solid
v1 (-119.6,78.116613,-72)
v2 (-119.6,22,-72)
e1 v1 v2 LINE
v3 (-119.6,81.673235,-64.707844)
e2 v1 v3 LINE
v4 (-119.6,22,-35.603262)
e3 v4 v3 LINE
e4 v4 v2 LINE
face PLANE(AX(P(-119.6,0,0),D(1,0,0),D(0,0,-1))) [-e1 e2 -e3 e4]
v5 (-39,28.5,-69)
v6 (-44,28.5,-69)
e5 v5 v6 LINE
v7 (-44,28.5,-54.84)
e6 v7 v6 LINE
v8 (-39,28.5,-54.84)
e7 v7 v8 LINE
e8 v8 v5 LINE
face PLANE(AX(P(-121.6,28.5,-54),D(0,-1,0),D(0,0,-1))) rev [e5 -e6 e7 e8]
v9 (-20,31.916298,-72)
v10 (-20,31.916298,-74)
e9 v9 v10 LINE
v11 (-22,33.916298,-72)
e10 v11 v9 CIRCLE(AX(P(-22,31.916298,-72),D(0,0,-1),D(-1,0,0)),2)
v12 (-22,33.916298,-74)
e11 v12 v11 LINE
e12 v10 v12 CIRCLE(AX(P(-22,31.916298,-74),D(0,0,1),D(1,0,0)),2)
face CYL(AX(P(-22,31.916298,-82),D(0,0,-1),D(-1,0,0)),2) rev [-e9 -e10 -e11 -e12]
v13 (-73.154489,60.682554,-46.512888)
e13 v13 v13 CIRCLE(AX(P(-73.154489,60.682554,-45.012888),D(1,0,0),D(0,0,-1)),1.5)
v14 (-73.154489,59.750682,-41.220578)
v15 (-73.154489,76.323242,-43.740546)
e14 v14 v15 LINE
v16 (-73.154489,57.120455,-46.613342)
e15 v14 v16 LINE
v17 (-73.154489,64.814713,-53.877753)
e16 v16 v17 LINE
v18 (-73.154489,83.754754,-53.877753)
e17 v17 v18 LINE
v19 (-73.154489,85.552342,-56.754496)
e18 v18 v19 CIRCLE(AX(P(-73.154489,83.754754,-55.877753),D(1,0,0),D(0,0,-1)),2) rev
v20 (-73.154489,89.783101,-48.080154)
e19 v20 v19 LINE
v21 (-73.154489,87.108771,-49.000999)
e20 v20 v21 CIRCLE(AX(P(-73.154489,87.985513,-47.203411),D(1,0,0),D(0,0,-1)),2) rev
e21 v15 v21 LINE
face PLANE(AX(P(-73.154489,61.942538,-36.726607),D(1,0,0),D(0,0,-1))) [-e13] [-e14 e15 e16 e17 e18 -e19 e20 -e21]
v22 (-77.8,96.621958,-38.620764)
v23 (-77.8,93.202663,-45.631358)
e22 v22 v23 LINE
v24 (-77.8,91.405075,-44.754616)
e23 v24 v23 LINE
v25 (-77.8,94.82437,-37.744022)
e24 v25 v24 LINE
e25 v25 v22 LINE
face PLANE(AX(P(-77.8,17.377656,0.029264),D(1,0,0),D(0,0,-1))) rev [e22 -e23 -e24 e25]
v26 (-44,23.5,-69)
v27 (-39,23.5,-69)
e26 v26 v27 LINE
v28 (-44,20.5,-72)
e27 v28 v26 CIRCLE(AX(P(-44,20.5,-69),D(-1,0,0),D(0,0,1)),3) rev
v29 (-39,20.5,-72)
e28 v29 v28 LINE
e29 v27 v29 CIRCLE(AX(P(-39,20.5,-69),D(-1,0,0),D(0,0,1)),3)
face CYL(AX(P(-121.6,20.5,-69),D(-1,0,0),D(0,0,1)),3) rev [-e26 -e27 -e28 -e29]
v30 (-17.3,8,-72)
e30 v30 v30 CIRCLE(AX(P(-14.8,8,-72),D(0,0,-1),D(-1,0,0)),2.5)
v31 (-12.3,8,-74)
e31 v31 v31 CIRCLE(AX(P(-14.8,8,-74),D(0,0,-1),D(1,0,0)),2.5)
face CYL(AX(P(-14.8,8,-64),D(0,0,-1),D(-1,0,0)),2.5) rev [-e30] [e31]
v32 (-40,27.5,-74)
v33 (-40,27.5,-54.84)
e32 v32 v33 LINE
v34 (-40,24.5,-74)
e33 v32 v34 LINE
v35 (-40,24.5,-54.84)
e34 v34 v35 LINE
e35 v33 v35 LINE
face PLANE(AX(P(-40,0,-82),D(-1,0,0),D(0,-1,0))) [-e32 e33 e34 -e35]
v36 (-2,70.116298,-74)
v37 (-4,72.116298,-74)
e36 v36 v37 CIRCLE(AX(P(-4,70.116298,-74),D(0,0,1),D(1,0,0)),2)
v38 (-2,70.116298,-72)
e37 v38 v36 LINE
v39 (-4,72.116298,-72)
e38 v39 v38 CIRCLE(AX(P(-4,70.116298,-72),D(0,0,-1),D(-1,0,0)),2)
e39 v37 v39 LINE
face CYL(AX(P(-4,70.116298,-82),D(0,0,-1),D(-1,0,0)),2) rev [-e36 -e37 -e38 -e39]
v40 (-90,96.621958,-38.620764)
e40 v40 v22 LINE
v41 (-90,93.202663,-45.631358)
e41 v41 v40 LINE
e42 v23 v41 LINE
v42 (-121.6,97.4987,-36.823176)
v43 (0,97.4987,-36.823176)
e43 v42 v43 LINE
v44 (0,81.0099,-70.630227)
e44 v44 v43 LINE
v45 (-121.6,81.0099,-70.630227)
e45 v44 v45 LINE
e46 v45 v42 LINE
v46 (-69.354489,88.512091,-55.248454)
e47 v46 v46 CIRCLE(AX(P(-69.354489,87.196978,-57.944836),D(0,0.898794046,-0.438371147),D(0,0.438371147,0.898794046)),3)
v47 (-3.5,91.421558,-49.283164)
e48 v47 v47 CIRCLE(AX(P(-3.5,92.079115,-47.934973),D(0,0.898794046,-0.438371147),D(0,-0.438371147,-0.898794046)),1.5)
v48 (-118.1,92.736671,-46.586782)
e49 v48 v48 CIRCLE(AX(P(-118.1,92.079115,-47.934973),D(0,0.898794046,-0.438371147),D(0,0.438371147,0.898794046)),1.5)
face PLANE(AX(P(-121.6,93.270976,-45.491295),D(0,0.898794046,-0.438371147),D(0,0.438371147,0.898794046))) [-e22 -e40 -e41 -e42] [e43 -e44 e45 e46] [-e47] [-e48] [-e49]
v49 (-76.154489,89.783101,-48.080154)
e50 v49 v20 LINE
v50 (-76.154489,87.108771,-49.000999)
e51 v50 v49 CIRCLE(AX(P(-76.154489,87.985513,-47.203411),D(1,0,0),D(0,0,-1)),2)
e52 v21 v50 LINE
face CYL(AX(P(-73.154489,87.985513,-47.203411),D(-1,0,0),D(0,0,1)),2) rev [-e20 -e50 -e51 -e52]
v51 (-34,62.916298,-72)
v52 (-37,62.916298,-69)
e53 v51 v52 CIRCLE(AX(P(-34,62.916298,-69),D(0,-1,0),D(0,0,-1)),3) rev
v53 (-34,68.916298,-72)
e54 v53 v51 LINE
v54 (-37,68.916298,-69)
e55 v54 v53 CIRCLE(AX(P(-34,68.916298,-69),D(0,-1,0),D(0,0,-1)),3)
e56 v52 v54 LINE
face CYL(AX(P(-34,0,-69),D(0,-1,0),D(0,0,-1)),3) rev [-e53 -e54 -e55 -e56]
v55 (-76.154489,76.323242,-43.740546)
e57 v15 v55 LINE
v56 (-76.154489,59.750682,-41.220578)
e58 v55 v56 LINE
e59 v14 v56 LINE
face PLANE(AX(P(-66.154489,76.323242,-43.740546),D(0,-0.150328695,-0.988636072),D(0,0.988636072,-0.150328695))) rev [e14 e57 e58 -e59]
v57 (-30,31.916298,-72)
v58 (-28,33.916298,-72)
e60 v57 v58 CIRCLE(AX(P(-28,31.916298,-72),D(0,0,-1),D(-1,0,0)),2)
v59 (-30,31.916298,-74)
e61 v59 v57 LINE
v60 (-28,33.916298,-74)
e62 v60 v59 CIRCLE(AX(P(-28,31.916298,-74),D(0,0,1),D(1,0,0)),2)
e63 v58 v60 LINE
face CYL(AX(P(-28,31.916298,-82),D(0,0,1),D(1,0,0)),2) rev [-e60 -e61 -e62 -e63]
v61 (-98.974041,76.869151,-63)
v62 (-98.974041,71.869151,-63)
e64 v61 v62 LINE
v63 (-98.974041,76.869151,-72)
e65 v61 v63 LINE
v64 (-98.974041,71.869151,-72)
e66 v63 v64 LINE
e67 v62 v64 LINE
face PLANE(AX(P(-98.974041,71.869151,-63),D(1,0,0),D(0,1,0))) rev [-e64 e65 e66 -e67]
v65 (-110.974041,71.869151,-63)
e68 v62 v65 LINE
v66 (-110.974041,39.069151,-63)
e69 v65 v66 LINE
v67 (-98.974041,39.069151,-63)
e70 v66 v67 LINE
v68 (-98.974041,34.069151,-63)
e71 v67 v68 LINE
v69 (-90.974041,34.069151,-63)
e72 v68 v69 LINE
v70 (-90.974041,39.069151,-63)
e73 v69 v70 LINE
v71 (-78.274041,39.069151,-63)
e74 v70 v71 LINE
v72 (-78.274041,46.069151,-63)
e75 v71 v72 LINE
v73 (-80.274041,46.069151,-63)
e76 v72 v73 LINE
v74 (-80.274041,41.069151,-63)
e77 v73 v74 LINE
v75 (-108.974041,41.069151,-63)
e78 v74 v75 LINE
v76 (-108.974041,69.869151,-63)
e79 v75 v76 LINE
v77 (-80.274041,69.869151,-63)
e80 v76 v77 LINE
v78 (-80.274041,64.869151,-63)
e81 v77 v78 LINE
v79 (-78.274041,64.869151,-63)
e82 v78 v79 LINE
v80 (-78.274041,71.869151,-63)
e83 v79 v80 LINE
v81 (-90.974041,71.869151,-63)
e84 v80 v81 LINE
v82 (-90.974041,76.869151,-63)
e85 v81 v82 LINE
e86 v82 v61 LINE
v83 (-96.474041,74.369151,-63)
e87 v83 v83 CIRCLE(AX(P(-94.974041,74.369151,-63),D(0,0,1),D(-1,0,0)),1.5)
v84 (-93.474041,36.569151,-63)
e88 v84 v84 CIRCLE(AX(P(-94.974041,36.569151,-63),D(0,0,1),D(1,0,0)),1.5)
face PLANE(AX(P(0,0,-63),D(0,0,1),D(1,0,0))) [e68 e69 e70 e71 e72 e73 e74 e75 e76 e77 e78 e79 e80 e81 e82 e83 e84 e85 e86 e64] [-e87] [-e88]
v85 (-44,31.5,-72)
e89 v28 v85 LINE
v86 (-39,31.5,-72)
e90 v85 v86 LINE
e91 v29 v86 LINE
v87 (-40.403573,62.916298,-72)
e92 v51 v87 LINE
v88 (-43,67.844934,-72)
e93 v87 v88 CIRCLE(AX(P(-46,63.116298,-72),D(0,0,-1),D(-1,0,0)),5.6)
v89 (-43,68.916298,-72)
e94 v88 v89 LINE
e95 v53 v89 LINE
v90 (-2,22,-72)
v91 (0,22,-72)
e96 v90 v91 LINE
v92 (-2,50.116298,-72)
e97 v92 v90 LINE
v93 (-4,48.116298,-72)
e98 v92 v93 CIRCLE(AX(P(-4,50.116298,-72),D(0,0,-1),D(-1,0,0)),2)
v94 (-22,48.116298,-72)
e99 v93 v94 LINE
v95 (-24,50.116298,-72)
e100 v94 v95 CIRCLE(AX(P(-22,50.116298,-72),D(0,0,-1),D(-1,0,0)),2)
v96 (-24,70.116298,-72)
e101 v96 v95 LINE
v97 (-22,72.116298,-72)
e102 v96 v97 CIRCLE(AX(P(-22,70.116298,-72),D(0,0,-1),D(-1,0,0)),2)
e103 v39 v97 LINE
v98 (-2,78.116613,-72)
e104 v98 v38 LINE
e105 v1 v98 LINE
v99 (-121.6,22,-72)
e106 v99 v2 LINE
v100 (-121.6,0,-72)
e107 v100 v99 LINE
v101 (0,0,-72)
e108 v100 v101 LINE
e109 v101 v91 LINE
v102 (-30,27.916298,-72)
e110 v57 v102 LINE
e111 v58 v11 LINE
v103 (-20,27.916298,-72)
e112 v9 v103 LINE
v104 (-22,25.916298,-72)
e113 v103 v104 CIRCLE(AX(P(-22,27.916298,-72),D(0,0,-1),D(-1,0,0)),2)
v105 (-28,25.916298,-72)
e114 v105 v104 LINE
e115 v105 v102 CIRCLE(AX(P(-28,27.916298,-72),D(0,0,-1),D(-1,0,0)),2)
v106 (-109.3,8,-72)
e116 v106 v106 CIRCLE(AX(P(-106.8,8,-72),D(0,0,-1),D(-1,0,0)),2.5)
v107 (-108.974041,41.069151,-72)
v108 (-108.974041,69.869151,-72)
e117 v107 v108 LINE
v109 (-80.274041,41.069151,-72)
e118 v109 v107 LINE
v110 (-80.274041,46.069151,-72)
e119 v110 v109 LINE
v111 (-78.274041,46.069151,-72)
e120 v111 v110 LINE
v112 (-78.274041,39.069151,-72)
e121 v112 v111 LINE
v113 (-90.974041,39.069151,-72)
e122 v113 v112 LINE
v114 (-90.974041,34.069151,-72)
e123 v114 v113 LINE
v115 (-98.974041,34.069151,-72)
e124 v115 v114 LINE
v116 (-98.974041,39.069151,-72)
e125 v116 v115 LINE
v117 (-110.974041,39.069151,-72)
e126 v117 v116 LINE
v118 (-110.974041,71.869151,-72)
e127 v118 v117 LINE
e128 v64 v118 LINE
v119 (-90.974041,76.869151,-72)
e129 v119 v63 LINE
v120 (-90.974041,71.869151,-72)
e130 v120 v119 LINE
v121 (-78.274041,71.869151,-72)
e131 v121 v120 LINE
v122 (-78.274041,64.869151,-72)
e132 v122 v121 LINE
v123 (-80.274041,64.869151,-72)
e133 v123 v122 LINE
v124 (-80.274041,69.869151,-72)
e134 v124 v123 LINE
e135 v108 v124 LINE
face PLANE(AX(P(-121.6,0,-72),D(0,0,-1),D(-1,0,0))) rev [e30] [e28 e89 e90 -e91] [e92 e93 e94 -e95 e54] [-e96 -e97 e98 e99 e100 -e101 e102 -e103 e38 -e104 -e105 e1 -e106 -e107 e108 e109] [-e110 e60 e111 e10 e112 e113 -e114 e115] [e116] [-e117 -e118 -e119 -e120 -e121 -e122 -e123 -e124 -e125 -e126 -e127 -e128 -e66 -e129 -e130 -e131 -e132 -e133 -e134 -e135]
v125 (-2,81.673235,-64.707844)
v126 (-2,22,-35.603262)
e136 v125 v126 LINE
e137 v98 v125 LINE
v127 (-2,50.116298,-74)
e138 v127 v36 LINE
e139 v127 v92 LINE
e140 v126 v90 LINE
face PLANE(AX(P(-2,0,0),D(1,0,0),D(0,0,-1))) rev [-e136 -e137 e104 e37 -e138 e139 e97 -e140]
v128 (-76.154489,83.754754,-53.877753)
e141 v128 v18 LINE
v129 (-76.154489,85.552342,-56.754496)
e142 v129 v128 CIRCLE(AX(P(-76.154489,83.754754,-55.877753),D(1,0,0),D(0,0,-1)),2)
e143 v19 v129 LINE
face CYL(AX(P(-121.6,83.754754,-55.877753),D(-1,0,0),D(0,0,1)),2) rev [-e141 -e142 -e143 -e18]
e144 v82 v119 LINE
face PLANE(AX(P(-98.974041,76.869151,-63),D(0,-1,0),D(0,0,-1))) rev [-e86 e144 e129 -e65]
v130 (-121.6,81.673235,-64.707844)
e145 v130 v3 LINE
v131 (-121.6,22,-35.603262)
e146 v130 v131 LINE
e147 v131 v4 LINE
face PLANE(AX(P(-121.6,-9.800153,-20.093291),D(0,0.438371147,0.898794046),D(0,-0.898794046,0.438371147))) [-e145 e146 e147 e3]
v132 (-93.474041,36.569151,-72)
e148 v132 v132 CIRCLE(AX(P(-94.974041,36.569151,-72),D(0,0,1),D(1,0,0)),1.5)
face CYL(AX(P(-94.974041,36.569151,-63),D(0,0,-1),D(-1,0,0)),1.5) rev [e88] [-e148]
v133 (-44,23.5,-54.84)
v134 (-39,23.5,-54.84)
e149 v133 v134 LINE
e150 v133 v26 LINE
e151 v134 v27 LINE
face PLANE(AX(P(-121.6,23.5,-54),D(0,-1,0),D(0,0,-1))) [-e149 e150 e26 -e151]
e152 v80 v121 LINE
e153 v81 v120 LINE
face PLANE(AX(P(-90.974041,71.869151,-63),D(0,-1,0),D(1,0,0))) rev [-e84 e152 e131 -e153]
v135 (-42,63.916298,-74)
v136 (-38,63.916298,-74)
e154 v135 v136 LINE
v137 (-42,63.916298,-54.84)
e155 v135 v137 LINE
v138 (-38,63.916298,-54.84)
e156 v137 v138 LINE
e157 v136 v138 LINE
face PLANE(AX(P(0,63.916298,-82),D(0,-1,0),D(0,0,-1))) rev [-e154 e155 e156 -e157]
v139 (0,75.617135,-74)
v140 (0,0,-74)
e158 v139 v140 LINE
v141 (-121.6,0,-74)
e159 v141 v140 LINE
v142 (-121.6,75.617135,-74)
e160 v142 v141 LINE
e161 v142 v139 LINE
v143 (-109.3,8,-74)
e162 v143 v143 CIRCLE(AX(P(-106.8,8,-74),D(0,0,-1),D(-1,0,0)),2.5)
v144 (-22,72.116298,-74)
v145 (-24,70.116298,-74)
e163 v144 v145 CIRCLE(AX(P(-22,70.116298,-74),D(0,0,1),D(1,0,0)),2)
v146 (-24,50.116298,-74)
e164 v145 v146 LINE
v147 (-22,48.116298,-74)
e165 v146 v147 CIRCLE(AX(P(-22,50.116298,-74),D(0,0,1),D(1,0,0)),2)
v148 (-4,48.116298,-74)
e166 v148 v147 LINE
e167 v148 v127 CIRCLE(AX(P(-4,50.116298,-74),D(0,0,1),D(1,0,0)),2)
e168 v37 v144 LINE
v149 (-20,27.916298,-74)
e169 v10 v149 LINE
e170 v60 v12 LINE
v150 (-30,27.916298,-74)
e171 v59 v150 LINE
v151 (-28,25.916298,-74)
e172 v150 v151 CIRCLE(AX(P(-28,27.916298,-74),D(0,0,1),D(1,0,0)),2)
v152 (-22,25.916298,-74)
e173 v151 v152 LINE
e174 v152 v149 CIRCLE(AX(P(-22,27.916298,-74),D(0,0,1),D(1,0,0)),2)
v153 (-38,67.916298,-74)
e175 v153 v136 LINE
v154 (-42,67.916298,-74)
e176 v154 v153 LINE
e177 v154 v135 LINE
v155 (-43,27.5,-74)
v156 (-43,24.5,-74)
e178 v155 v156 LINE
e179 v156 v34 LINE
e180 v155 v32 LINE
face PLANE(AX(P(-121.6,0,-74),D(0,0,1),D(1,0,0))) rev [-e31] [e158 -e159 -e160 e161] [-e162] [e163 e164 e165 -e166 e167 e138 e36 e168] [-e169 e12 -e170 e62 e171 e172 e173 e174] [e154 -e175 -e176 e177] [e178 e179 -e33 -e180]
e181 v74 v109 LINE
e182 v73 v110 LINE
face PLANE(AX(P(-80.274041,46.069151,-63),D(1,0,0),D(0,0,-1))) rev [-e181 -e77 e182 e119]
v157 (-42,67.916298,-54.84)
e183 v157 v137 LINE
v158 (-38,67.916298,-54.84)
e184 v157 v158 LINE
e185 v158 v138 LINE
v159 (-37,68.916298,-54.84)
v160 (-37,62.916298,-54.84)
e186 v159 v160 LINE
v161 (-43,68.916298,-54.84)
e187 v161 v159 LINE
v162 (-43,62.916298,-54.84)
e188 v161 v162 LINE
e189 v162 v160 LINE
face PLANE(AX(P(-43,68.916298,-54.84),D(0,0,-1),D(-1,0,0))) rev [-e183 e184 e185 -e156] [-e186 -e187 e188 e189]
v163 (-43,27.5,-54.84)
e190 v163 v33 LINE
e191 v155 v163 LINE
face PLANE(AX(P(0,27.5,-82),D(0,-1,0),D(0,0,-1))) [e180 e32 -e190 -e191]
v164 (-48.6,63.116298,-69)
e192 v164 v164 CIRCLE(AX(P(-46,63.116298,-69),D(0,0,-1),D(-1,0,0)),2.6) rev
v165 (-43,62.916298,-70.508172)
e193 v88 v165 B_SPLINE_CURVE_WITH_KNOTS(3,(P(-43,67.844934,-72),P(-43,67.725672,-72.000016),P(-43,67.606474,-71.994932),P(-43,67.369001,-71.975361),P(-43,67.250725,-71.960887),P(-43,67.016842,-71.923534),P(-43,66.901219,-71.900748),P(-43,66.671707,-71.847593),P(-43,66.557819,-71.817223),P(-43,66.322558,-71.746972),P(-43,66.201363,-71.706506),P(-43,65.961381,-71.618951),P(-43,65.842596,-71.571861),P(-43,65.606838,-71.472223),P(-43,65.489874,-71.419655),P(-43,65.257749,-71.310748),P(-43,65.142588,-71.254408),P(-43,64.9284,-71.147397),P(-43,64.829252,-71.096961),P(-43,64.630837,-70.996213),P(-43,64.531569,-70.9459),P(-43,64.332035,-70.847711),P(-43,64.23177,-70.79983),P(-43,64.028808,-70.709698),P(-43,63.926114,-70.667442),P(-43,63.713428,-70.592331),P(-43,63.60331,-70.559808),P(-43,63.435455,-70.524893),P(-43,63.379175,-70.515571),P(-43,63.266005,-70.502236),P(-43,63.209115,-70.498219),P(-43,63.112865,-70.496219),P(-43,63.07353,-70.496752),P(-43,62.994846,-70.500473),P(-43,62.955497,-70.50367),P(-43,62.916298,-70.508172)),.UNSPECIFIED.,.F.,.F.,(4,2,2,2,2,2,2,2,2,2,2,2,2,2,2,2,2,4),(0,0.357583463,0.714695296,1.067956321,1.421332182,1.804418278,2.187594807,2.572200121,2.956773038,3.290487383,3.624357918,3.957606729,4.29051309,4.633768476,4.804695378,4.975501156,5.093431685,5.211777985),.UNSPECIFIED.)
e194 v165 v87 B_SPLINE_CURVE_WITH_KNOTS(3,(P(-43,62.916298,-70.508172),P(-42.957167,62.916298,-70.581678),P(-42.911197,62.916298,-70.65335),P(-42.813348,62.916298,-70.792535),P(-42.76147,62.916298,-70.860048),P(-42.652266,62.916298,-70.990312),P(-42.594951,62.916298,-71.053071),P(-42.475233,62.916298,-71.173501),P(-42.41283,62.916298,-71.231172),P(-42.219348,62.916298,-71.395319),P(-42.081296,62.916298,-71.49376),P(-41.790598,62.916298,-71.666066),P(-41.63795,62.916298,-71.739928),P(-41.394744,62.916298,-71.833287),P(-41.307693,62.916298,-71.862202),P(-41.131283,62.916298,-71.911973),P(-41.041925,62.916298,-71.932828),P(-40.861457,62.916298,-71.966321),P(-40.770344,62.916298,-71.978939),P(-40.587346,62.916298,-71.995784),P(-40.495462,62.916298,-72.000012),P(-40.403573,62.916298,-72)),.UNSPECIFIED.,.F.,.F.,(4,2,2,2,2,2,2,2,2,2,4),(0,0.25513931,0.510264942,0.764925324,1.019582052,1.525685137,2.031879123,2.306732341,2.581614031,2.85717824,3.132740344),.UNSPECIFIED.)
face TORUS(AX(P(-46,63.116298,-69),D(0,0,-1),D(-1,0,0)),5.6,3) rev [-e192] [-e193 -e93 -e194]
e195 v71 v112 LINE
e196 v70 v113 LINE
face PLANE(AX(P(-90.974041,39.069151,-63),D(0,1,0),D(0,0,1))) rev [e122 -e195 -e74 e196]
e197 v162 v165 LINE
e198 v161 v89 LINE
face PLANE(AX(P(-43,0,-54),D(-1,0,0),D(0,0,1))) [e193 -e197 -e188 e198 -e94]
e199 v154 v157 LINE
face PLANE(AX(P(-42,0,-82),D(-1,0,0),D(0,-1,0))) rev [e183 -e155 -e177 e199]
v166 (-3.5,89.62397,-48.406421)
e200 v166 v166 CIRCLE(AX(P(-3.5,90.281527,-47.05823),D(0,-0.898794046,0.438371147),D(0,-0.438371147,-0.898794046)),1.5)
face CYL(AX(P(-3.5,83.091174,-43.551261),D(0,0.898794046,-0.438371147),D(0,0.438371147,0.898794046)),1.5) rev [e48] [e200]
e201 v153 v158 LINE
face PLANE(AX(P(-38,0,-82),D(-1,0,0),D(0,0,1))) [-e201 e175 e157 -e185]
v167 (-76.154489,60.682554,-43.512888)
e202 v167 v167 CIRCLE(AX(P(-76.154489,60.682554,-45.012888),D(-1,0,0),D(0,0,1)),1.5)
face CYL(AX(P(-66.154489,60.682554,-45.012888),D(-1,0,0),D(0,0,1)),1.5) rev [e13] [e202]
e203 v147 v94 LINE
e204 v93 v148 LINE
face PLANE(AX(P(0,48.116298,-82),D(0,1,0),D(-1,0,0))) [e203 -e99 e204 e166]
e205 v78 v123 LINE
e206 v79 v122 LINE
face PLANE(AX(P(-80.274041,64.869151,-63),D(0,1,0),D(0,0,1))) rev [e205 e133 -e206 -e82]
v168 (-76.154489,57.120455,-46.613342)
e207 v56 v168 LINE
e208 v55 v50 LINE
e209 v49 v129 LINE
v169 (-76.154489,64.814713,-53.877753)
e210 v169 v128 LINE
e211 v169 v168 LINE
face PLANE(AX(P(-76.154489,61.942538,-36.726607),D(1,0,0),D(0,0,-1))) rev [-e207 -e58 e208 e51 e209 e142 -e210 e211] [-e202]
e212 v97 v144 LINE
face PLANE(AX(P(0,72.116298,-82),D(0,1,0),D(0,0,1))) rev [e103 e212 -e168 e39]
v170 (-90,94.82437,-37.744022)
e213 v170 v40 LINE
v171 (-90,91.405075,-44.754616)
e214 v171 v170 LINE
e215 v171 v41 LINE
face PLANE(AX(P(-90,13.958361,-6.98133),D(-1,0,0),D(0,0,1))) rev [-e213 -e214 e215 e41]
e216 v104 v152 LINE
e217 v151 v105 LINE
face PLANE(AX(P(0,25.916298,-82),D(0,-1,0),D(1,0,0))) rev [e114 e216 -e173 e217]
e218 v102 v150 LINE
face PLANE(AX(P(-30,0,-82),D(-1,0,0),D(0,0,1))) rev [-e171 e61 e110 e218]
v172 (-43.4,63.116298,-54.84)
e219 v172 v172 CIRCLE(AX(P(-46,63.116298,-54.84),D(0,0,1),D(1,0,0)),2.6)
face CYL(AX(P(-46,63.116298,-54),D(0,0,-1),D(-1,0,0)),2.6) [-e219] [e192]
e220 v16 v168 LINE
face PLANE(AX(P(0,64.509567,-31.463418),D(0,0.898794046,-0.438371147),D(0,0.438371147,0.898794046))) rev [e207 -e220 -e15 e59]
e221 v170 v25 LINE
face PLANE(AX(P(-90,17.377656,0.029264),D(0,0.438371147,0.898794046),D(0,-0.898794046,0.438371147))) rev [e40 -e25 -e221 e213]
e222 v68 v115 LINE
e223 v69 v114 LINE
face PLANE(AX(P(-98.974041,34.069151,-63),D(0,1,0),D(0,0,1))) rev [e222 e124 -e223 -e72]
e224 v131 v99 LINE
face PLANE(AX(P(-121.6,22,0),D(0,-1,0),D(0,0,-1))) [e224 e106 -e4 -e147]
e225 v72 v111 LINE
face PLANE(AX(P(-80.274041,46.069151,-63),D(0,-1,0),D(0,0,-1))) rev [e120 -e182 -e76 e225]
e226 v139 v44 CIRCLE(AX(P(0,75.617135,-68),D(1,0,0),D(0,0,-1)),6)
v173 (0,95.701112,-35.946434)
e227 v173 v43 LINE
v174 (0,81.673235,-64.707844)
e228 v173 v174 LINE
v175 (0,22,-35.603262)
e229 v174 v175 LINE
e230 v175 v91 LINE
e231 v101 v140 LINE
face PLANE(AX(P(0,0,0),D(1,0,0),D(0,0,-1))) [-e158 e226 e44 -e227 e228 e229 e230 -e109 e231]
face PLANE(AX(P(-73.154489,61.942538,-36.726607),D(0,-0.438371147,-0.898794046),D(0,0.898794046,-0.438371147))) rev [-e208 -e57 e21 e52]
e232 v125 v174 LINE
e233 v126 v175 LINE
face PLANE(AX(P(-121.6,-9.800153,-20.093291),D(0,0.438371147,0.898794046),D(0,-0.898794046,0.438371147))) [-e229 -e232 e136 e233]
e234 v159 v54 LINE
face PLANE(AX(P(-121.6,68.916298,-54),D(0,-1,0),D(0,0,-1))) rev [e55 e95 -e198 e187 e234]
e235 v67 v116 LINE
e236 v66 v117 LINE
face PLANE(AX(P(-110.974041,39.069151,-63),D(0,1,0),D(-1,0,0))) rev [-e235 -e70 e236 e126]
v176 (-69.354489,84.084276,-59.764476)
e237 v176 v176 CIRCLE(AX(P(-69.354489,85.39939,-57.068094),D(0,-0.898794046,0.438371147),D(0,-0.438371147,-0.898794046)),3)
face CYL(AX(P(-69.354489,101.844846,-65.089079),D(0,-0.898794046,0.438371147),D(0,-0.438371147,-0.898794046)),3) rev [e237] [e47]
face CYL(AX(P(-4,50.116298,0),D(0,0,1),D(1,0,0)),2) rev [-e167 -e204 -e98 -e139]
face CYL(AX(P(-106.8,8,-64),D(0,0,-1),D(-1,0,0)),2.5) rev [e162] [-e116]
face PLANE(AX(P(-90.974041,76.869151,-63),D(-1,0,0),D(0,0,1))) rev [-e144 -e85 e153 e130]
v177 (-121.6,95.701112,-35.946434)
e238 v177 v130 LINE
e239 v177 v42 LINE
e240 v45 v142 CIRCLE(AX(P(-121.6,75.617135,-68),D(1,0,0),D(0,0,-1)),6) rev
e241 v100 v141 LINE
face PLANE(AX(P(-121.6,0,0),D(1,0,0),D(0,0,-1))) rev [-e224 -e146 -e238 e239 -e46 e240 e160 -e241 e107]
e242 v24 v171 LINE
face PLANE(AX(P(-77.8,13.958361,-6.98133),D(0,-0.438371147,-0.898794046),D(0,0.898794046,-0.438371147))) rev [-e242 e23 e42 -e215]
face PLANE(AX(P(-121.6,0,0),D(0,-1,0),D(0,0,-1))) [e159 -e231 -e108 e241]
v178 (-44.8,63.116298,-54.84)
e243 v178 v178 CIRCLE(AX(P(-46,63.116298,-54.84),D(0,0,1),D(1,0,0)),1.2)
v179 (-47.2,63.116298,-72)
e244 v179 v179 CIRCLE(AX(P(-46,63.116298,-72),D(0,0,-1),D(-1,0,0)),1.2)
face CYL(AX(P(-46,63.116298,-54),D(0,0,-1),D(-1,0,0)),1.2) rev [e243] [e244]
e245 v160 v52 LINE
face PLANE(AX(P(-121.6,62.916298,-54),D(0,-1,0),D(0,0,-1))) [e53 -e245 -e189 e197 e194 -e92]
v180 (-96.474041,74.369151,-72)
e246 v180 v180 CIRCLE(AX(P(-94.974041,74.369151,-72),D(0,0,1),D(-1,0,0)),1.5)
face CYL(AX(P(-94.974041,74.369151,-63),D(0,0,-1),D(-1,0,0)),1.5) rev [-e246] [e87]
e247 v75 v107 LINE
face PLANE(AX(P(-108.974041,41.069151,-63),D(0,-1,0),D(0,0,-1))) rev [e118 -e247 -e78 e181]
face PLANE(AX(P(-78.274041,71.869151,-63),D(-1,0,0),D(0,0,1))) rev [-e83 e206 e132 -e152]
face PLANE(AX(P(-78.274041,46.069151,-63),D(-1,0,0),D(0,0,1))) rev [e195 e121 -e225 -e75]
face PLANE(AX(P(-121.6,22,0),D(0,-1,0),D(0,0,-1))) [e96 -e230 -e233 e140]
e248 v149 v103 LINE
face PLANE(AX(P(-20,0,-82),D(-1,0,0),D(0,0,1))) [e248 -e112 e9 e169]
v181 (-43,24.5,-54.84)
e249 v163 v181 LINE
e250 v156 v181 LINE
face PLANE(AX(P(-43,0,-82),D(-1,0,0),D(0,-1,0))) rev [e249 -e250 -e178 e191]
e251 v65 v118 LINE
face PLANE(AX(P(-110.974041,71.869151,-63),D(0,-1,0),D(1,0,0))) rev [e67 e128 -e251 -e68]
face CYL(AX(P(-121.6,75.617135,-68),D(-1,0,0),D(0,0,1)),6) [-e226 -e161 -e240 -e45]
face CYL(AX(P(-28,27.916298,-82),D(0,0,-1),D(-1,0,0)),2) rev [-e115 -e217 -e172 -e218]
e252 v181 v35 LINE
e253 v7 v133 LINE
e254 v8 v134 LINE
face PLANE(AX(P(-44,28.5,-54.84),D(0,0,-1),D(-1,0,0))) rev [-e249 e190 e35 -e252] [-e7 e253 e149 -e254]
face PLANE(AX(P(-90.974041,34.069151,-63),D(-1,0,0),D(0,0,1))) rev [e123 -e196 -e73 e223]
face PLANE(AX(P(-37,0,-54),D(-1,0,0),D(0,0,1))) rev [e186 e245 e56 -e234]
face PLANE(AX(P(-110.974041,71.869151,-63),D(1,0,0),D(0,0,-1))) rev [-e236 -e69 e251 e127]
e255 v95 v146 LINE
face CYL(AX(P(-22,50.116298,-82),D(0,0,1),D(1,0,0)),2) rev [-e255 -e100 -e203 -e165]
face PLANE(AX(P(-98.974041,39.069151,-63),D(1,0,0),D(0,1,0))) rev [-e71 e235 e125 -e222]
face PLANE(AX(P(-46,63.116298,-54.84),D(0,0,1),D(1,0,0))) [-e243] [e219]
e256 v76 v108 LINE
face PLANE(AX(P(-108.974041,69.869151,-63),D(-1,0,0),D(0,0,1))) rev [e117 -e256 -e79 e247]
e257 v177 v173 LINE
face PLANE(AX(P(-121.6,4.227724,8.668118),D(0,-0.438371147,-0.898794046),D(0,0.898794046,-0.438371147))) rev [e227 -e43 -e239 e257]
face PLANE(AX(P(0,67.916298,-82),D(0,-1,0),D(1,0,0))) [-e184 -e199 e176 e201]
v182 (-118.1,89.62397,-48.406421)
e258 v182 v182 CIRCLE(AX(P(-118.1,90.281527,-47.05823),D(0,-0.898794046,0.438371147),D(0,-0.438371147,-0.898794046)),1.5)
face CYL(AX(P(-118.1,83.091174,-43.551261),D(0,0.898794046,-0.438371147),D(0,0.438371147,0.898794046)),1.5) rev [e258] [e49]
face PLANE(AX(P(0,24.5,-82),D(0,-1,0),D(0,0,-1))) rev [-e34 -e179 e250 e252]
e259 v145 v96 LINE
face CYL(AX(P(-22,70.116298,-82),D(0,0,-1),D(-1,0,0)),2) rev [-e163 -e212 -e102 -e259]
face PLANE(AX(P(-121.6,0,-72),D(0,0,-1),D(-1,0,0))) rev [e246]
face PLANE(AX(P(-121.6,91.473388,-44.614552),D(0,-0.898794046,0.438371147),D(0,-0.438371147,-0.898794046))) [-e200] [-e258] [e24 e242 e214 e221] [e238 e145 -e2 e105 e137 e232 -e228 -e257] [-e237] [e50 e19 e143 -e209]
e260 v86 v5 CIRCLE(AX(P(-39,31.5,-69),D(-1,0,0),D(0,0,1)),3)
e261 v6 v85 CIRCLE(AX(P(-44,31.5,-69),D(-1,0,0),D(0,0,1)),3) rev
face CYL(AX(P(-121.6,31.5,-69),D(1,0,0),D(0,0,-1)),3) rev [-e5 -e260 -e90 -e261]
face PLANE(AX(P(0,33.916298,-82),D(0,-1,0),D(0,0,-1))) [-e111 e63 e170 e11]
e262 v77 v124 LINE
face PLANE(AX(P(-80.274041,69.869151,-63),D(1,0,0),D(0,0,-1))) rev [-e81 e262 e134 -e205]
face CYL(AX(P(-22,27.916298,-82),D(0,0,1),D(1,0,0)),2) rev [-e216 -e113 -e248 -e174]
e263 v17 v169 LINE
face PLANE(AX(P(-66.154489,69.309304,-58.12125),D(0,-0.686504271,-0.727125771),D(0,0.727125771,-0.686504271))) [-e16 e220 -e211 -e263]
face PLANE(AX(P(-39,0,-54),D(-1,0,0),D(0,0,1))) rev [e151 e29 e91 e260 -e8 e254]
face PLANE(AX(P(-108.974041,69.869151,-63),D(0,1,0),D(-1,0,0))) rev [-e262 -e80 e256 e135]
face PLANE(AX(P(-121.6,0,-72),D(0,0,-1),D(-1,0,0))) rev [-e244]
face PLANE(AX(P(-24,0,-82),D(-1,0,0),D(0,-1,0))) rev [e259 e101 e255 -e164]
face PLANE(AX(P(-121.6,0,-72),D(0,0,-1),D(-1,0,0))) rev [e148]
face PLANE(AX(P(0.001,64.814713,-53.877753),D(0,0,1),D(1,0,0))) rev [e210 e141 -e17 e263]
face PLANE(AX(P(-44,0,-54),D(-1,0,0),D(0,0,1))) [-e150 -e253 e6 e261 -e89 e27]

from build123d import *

# Parameters (mm, degrees)
CROQUIS1_W                 = 2
CROQUIS1_H                 = 22
SALIENTE_EXTRUIR1_DEPTH    = 121.6
VACIADO1_START             = -119.6
VACIADO1_DEPTH             = 117.6
CORTAR_EXTRUIR2_DEPTH      = 2
CROQUIS7_W                 = 10
CROQUIS7_H                 = 8
CORTAR_EXTRUIR3_DEPTH      = 10
SALIENTE_EXTRUIR4_START    = -72
CROQUIS8_W                 = 5.999999999999993
CROQUIS8_H                 = 6
CROQUIS8_W_2               = 5.000000000000007
CROQUIS8_H_2               = 5
CROQUIS8_R                 = 2.599999999999998
CROQUIS8_R_2               = 1.2000000000000022
SALIENTE_EXTRUIR4_DEPTH    = 18
REDONDEO1_R                = 3
CROQUIS10_W                = 3
CROQUIS10_H                = 16.000000000000004
SALIENTE_EXTRUIR5_DEPTH    = 30
CROQUIS10_4_R              = 3.000000000000008
CORTAR_EXTRUIR6_DEPTH      = 155.97562792830414
CROQUIS18_R                = 1.5000000000000042
CORTAR_EXTRUIR12_DEPTH     = 10
REDONDEO5_R                = 2
CORTAR_EXTRUIR13_REACH     = 172.896
CROQUIS13_R                = 1.4999999999999973
SALIENTE_EXTRUIR6_DEPTH    = 9
CORTAR_EXTRUIR18_REACH     = 146.158
REDONDEO6_R                = 2
CROQUIS14_R                = 2.499999999999995
CROQUIS14_R_2              = 2.4999999999999902
CORTAR_EXTRUIR9_DEPTH      = 10
REDONDEO4_R                = 2
CROQUIS16_R                = 1.4999999999999971
CROQUIS16_R_2              = 1.4999999999999967
CORTAR_EXTRUIR11_DEPTH     = 10
CORTAR_EXTRUIR19_REACH     = 157.881
REDONDEO7_R                = 6
CORTAR_EXTRUIR20_START     = -5
CORTAR_EXTRUIR20_OUTLINE_W = 5
CORTAR_EXTRUIR20_OUTLINE_H = 0.8399999999999963
CORTAR_EXTRUIR20_DEPTH     = 5
CORTAR_EXTRUIR21_START     = -6
CORTAR_EXTRUIR21_OUTLINE_W = 6
CORTAR_EXTRUIR21_OUTLINE_H = 0.8399999999999963
CORTAR_EXTRUIR21_DEPTH     = 6
CORTAR_EXTRUIR22_START     = -0.8400000000000002
CROQUIS25_R                = 2.599999999999998
CROQUIS25_R_2              = 1.1999999999999982
CORTAR_EXTRUIR22_DEPTH     = 0.8400000000000002


# Read off the part's stored shape, not the designer's step: Vaciado1, Cortar-Extruir20, Cortar-Extruir21
with BuildPart() as part:
    # Croquis1 → Saliente-Extruir1 (new body)
    with BuildSketch(Plane(origin=(0, 0, 0), x_dir=(0, 0, -1), z_dir=(1, 0, 0))):
        with Locations((73, 11)):
            Rectangle(CROQUIS1_W, CROQUIS1_H)
        Polygon((72, 78.1166127422233), (72, 22), (74, 22), (74, 77.14114756509154), align=None)
        Polygon((64.70784351827794, 81.67323509928094), (72, 78.11661274222328), (74, 77.14114756509154), (74, 79.36635144604195), (65.5845858118561, 83.47082319187929), align=None)
        Polygon((36.82317633028281, 97.49869988912988), (35.94643403670465, 95.70111179653155), (64.70784351827794, 81.67323509928094), (65.5845858118561, 83.47082319187929), align=None)
        Polygon((35.603262095206105, 22), (72, 22), (72, 78.1166127422233), (64.70784351827794, 81.67323509928094), align=None)
    extrude(amount=-SALIENTE_EXTRUIR1_DEPTH)

    # Vaciado1 outline → Vaciado1 (cut)
    with BuildSketch(Plane.YZ.offset(VACIADO1_START)):
        Polygon((22, -37.828465976), (22, -72), (78.116612742, -72), (80.796492806, -66.505431611), align=None)
    extrude(amount=VACIADO1_DEPTH, mode=Mode.SUBTRACT)

    # Croquis6 → Cortar-Extruir2 (cut)
    with BuildSketch(Plane(origin=(0, -9.800152925832764, -20.093291191899283), x_dir=(1, 0, 0), z_dir=(0, 0.4383711467890813, 0.8987940462991653))):
        Polygon((-119.6, 35.38091185268935), (-119.6, 99.77346901858166), (-2.0000000000000018, 99.77346901858166), (-1.999999999999988, 35.38091185268935), align=None)
    extrude(amount=-CORTAR_EXTRUIR2_DEPTH, mode=Mode.SUBTRACT)

    # Croquis7 → Cortar-Extruir3 (cut)
    with BuildSketch(Plane.XY.offset(-72)):
        Polygon((-23.999999999999996, 48.116297599242344), (-1.9999999999999971, 48.11629759924235), (-2, 72.11629759924234), (-24, 72.11629759924234), align=None)
        with Locations((-25.000000000000004, 29.91629759924235)):
            Rectangle(CROQUIS7_W, CROQUIS7_H)
        Polygon((-39.99999999999999, 27.499999999999993), (-40, 24.499999999999993), (-43, 24.499999999999993), (-43, 27.499999999999993), align=None)
        Polygon((-38.00000000000001, 67.91629759924236), (-38.00000000000001, 63.91629759924236), (-41.99999999999999, 63.91629759924236), (-42, 67.91629759924237), align=None)
    extrude(amount=-CORTAR_EXTRUIR3_DEPTH, mode=Mode.SUBTRACT)

    # Croquis8 → Saliente-Extruir4 (add)
    # profile 1 of 3: a face of its own
    with BuildSketch(Plane.XY.offset(SALIENTE_EXTRUIR4_START)):
        with Locations((-40, 65.91629759924237)):
            Rectangle(CROQUIS8_W, CROQUIS8_H)
        Polygon((-41.99999999999999, 63.91629759924236), (-42, 67.91629759924237), (-38.00000000000001, 67.91629759924236), (-38.00000000000001, 63.91629759924236), align=None, mode=Mode.SUBTRACT)
    # profile 2 of 3: a face of its own
    with BuildSketch(Plane.XY.offset(SALIENTE_EXTRUIR4_START)):
        with Locations((-41.5, 26.000000000000007)):
            Rectangle(CROQUIS8_W_2, CROQUIS8_H_2)
        Polygon((-43, 24.499999999999993), (-43, 27.499999999999993), (-39.99999999999999, 27.499999999999993), (-40, 24.499999999999993), align=None, mode=Mode.SUBTRACT)
    # profile 3 of 3: a face of its own
    with BuildSketch(Plane.XY.offset(SALIENTE_EXTRUIR4_START)):
        with Locations(Location((-46, 63.116297599242365, 0), (0, 0, 180))):
            Circle(CROQUIS8_R)
        with Locations(Location((-46, 63.116297599242365, 0), (0, 0, 180))):
            Circle(CROQUIS8_R_2, mode=Mode.SUBTRACT)
    extrude(amount=SALIENTE_EXTRUIR4_DEPTH)

    # Redondeo1
    # the kernel refuses this fillet: 3 mm, written as the material it adds along each edge
    with BuildSketch(Plane(origin=(-46, 63.116297599242365, -72), x_dir=(-1, 0, 0), z_dir=(0, 1, 0))) as redondeo1_piece_1_section:
        with BuildLine():
            CenterArc((2.5999999999999943 + REDONDEO1_R, REDONDEO1_R), REDONDEO1_R, 180, 90)
            Line((2.5999999999999943, REDONDEO1_R), (2.5999999999999943, 0))
            Line((2.5999999999999943, 0), (2.5999999999999943 + REDONDEO1_R, 0))
        make_face()
    redondeo1_piece_1 = revolve(axis=Axis((-46, 63.116297599242365, -72), (0, 0, 1)), mode=Mode.PRIVATE)
    redondeo1_piece_1 = split(redondeo1_piece_1, bisect_by=Plane(origin=(-49.240846194400426, 63.91629759924236, -71.32895989591317), z_dir=(0, -1, 0)), keep=Keep.TOP, mode=Mode.PRIVATE)
    add(redondeo1_piece_1)
    with BuildSketch(Plane(origin=(-46, 63.116297599242365, -72), x_dir=(-1, 0, 0), z_dir=(0, 1, 0))) as redondeo1_piece_2_section:
        with BuildLine():
            CenterArc((2.5999999999999943 + REDONDEO1_R, REDONDEO1_R), REDONDEO1_R, 180, 90)
            Line((2.5999999999999943, REDONDEO1_R), (2.5999999999999943, 0))
            Line((2.5999999999999943, 0), (2.5999999999999943 + REDONDEO1_R, 0))
        make_face()
    redondeo1_piece_2 = revolve(axis=Axis((-46, 63.116297599242365, -72), (0, 0, 1)), mode=Mode.PRIVATE)
    redondeo1_piece_2 = split(redondeo1_piece_2, bisect_by=Plane(origin=(-43, 66.57147018864953, -71.13888088116816), z_dir=(-1, 0, 0)), keep=Keep.TOP, mode=Mode.PRIVATE)
    add(redondeo1_piece_2)
    with BuildSketch(Plane(origin=(-37.00000000000001, 62.91629759924236, -72), x_dir=(1, 0, 0), z_dir=(0, 1, 0))) as redondeo1_piece_3:
        with BuildLine():
            CenterArc((REDONDEO1_R, -REDONDEO1_R), REDONDEO1_R, 90, 90)
            Line((0, -REDONDEO1_R), (0, 0))
            Line((0, 0), (REDONDEO1_R, 0))
        make_face()
    extrude(amount=6.000000000000007)
    with BuildSketch(Plane(origin=(-39, 28.500000000000007, -72), x_dir=(0, 1, 0), z_dir=(-1, 0, 0)), Plane(origin=(-44.00000000000001, 23.500000000000007, -72), x_dir=(0, -1, 0), z_dir=(1, 0, 0))) as redondeo1_piece_4:
        with BuildLine():
            CenterArc((REDONDEO1_R, -REDONDEO1_R), REDONDEO1_R, 90, 90)
            Line((0, -REDONDEO1_R), (0, 0))
            Line((0, 0), (REDONDEO1_R, 0))
        make_face()
    extrude(amount=5.000000000000007)

    # Croquis10 → Saliente-Extruir5 (add)
    with BuildSketch(Plane(origin=(0, 91.47338802511378, -44.6145523263787), x_dir=(1, 0, 0), z_dir=(0, -0.8987940462991649, 0.43837114678908146))):
        with Locations((-74.65448942309818, -13.855834770640188)):
            Rectangle(CROQUIS10_W, CROQUIS10_H)
    extrude(amount=SALIENTE_EXTRUIR5_DEPTH)

    # Croquis10<4> → Cortar-Extruir6 (cut, through all)
    with BuildSketch(Plane(origin=(0, 91.47338802511378, -44.6145523263787), x_dir=(1, 0, 0), z_dir=(0, -0.8987940462991649, 0.43837114678908146))):
        with Locations(Location((-69.35448942309819, -13.855834770640188, 0), (0, 0, 270))):
            Circle(CROQUIS10_4_R)
    extrude(amount=-CORTAR_EXTRUIR6_DEPTH, mode=Mode.SUBTRACT)

    # Croquis18 → Cortar-Extruir12 (cut)
    with BuildSketch(Plane.ZY.offset(76.15448942309818)):
        with Locations((-45.01288758803531, 60.68255357376121)):
            Circle(CROQUIS18_R)
        Polygon((-36.72660735066928, 61.94253763232591), (-43.74054569929451, 76.32324237311258), (-41.22057758216512, 59.75068189838051), align=None)
        Polygon((-58.1212504400812, 69.30930402448735), (-46.61334185996013, 57.12045501764605), (-51.10731209145594, 54.9285992837006), align=None)
    extrude(amount=-CORTAR_EXTRUIR12_DEPTH, mode=Mode.SUBTRACT)

    # Redondeo5
    redondeo5_edges = [part.edges().sort_by_distance(p)[0] for p in [
        (-74.65448942309818, 88.90635902130086, -49.877741754341734),
    ]]
    fillet(redondeo5_edges, radius=REDONDEO5_R)

    # Croquis19 → Cortar-Extruir13 (cut, up to next)
    with BuildSketch(Plane(origin=(0, -9.800152925832764, -20.093291191899283), x_dir=(1, 0, 0), z_dir=(0, 0.4383711467890813, 0.8987940462991653)), mode=Mode.PRIVATE) as cortar_extruir13_sk1:
        Polygon((-2.0000000000000018, 99.7734690185817), (-2.0000000000000155, 101.77346901858162), (-119.6, 101.77346901858162), (-119.6, 99.7734690185817), align=None)
    cortar_extruir13_tool1 = extrude(cortar_extruir13_sk1.sketch, amount=-CORTAR_EXTRUIR13_REACH, mode=Mode.PRIVATE) & part.part
    add(cortar_extruir13_tool1.solids().sort_by_distance((-60.8, 80.774441, -64.269472))[0], mode=Mode.SUBTRACT)

    # Croquis13 → Saliente-Extruir6 (add)
    with BuildSketch(Plane.XY.offset(-72)):
        Polygon((-80.27404089393853, 64.86915071641589), (-78.27404089393853, 64.86915071641589), (-78.27404089393853, 71.86915071641589), (-90.97404089393851, 71.86915071641587), (-90.97404089393851, 76.86915071641587), (-98.97404089393852, 76.86915071641587), (-98.97404089393854, 71.86915071641586), (-110.97404089393854, 71.86915071641587), (-110.97404089393854, 39.06915071641588), (-98.97404089393854, 39.06915071641589), (-98.97404089393852, 34.06915071641589), (-90.97404089393851, 34.06915071641589), (-90.97404089393851, 39.06915071641588), (-78.27404089393853, 39.06915071641588), (-78.27404089393853, 46.06915071641588), (-80.27404089393853, 46.06915071641588), (-80.27404089393853, 41.06915071641588), (-108.97404089393852, 41.06915071641588), (-108.97404089393852, 69.86915071641587), (-80.27404089393853, 69.86915071641589), align=None)
        with Locations((-94.97404089393854, 36.56915071641589)):
            Circle(CROQUIS13_R, mode=Mode.SUBTRACT)
        with Locations(Location((-94.97404089393854, 74.36915071641587, 0), (0, 0, 180))):
            Circle(CROQUIS13_R, mode=Mode.SUBTRACT)
    extrude(amount=SALIENTE_EXTRUIR6_DEPTH)

    # Croquis21 → Cortar-Extruir18 (cut, up to next)
    with BuildSketch(Plane.ZY.offset(76.15448942309818), mode=Mode.PRIVATE) as cortar_extruir18_sk1:
        Polygon((-53.8777532957738, 64.81471270993062), (-53.8777532957738, 86.95542303790477), (-64.25844649512833, 81.89242067267547), (-58.1212504400812, 69.30930402448735), align=None)
    cortar_extruir18_tool1 = extrude(cortar_extruir18_sk1.sketch, amount=-CORTAR_EXTRUIR18_REACH, mode=Mode.PRIVATE) & part.part
    add(cortar_extruir18_tool1.solids().sort_by_distance((-76.154489, 77.293622, -57.480803))[0], mode=Mode.SUBTRACT)

    # Redondeo6
    redondeo6_edges = [part.edges().sort_by_distance(p)[0] for p in [
        (-74.65448942309818, 86.95542303790477, -53.8777532957738),
    ]]
    fillet(redondeo6_edges, radius=REDONDEO6_R)

    # Croquis14 → Cortar-Extruir9 (cut)
    with BuildSketch(Plane(origin=(0, 0, -74), x_dir=(-1, 0, 0), z_dir=(0, 0, -1))):
        with Locations((106.80000000000001, 7.999999999999987)):
            Circle(CROQUIS14_R)
        with Locations((14.799999999999965, 7.999999999999667)):
            Circle(CROQUIS14_R_2)
    extrude(amount=-CORTAR_EXTRUIR9_DEPTH, mode=Mode.SUBTRACT)

    # Redondeo4
    redondeo4_edges = [part.edges().sort_by_distance(p)[0] for p in [
        (-20.000000000000004, 25.916297599242352, -73),
        (-30.000000000000004, 25.91629759924235, -73),
        (-30.000000000000004, 33.91629759924235, -73),
        (-24, 72.11629759924234, -73),
        (-2, 72.11629759924234, -73),
        (-1.9999999999999987, 48.11629759924235, -73),
        (-23.999999999999996, 48.116297599242344, -73),
        (-20.000000000000004, 33.91629759924235, -73),
    ]]
    fillet(redondeo4_edges, radius=REDONDEO4_R)

    # Croquis16 → Cortar-Extruir11 (cut)
    with BuildSketch(Plane(origin=(0, 93.27097611771204, -45.49129461995686), x_dir=(1, 0, 0), z_dir=(0, 0.898794046299165, -0.4383711467890815))):
        with Locations(Location((-118.1, 2.7188409262715285, 0), (0, 0, 270))):
            Circle(CROQUIS16_R)
        with Locations(Location((-3.500000000000003, 2.7188409262715423, 0), (0, 0, 90))):
            Circle(CROQUIS16_R_2)
    extrude(amount=-CORTAR_EXTRUIR11_DEPTH, mode=Mode.SUBTRACT)

    # Croquis22 → Cortar-Extruir19 (cut, up to next)
    with BuildSketch(Plane(origin=(0, 93.27097611771204, -45.49129461995686), x_dir=(1, 0, 0), z_dir=(0, 0.898794046299165, -0.4383711467890815)), mode=Mode.PRIVATE) as cortar_extruir19_sk1:
        Polygon((-77.80000000000001, 0.15583477064016854), (-90.00000000000001, 0.15583477064016854), (-90.00000000000001, -7.644165229359831), (-77.80000000000001, -7.644165229359832), align=None)
    cortar_extruir19_tool1 = extrude(cortar_extruir19_sk1.sketch, amount=-CORTAR_EXTRUIR19_REACH, mode=Mode.PRIVATE) & part.part
    add(cortar_extruir19_tool1.solids().sort_by_distance((-83.9, 94.91231, -42.126061))[0], mode=Mode.SUBTRACT)

    # Redondeo7
    redondeo7_edges = [part.edges().sort_by_distance(p)[0] for p in [
        (-60.8, 79.36635144604195, -74),
    ]]
    fillet(redondeo7_edges, radius=REDONDEO7_R)

    # Cortar-Extruir20 outline → Cortar-Extruir20 (cut)
    with BuildSketch(Plane.XZ.offset(-23.500000000000007).offset(CORTAR_EXTRUIR20_START)):
        with Locations((-41.5, -54.42)):
            Rectangle(CORTAR_EXTRUIR20_OUTLINE_W, CORTAR_EXTRUIR20_OUTLINE_H)
    extrude(amount=CORTAR_EXTRUIR20_DEPTH, mode=Mode.SUBTRACT)

    # Cortar-Extruir21 outline → Cortar-Extruir21 (cut)
    with BuildSketch(Plane.XZ.offset(-62.91629759924236).offset(CORTAR_EXTRUIR21_START)):
        with Locations((-40, -54.42)):
            Rectangle(CORTAR_EXTRUIR21_OUTLINE_W, CORTAR_EXTRUIR21_OUTLINE_H)
    extrude(amount=CORTAR_EXTRUIR21_DEPTH, mode=Mode.SUBTRACT)

    # Croquis25 → Cortar-Extruir22 (cut)
    with BuildSketch(Plane.XY.offset(-53.99999999999999).offset(CORTAR_EXTRUIR22_START)):
        with Locations(Location((-46, 63.116297599242365, 0), (0, 0, 180))):
            Circle(CROQUIS25_R)
        with Locations(Location((-46, 63.116297599242365, 0), (0, 0, 180))):
            Circle(CROQUIS25_R_2, mode=Mode.SUBTRACT)
    extrude(amount=CORTAR_EXTRUIR22_DEPTH, mode=Mode.SUBTRACT)


solid = part.part
